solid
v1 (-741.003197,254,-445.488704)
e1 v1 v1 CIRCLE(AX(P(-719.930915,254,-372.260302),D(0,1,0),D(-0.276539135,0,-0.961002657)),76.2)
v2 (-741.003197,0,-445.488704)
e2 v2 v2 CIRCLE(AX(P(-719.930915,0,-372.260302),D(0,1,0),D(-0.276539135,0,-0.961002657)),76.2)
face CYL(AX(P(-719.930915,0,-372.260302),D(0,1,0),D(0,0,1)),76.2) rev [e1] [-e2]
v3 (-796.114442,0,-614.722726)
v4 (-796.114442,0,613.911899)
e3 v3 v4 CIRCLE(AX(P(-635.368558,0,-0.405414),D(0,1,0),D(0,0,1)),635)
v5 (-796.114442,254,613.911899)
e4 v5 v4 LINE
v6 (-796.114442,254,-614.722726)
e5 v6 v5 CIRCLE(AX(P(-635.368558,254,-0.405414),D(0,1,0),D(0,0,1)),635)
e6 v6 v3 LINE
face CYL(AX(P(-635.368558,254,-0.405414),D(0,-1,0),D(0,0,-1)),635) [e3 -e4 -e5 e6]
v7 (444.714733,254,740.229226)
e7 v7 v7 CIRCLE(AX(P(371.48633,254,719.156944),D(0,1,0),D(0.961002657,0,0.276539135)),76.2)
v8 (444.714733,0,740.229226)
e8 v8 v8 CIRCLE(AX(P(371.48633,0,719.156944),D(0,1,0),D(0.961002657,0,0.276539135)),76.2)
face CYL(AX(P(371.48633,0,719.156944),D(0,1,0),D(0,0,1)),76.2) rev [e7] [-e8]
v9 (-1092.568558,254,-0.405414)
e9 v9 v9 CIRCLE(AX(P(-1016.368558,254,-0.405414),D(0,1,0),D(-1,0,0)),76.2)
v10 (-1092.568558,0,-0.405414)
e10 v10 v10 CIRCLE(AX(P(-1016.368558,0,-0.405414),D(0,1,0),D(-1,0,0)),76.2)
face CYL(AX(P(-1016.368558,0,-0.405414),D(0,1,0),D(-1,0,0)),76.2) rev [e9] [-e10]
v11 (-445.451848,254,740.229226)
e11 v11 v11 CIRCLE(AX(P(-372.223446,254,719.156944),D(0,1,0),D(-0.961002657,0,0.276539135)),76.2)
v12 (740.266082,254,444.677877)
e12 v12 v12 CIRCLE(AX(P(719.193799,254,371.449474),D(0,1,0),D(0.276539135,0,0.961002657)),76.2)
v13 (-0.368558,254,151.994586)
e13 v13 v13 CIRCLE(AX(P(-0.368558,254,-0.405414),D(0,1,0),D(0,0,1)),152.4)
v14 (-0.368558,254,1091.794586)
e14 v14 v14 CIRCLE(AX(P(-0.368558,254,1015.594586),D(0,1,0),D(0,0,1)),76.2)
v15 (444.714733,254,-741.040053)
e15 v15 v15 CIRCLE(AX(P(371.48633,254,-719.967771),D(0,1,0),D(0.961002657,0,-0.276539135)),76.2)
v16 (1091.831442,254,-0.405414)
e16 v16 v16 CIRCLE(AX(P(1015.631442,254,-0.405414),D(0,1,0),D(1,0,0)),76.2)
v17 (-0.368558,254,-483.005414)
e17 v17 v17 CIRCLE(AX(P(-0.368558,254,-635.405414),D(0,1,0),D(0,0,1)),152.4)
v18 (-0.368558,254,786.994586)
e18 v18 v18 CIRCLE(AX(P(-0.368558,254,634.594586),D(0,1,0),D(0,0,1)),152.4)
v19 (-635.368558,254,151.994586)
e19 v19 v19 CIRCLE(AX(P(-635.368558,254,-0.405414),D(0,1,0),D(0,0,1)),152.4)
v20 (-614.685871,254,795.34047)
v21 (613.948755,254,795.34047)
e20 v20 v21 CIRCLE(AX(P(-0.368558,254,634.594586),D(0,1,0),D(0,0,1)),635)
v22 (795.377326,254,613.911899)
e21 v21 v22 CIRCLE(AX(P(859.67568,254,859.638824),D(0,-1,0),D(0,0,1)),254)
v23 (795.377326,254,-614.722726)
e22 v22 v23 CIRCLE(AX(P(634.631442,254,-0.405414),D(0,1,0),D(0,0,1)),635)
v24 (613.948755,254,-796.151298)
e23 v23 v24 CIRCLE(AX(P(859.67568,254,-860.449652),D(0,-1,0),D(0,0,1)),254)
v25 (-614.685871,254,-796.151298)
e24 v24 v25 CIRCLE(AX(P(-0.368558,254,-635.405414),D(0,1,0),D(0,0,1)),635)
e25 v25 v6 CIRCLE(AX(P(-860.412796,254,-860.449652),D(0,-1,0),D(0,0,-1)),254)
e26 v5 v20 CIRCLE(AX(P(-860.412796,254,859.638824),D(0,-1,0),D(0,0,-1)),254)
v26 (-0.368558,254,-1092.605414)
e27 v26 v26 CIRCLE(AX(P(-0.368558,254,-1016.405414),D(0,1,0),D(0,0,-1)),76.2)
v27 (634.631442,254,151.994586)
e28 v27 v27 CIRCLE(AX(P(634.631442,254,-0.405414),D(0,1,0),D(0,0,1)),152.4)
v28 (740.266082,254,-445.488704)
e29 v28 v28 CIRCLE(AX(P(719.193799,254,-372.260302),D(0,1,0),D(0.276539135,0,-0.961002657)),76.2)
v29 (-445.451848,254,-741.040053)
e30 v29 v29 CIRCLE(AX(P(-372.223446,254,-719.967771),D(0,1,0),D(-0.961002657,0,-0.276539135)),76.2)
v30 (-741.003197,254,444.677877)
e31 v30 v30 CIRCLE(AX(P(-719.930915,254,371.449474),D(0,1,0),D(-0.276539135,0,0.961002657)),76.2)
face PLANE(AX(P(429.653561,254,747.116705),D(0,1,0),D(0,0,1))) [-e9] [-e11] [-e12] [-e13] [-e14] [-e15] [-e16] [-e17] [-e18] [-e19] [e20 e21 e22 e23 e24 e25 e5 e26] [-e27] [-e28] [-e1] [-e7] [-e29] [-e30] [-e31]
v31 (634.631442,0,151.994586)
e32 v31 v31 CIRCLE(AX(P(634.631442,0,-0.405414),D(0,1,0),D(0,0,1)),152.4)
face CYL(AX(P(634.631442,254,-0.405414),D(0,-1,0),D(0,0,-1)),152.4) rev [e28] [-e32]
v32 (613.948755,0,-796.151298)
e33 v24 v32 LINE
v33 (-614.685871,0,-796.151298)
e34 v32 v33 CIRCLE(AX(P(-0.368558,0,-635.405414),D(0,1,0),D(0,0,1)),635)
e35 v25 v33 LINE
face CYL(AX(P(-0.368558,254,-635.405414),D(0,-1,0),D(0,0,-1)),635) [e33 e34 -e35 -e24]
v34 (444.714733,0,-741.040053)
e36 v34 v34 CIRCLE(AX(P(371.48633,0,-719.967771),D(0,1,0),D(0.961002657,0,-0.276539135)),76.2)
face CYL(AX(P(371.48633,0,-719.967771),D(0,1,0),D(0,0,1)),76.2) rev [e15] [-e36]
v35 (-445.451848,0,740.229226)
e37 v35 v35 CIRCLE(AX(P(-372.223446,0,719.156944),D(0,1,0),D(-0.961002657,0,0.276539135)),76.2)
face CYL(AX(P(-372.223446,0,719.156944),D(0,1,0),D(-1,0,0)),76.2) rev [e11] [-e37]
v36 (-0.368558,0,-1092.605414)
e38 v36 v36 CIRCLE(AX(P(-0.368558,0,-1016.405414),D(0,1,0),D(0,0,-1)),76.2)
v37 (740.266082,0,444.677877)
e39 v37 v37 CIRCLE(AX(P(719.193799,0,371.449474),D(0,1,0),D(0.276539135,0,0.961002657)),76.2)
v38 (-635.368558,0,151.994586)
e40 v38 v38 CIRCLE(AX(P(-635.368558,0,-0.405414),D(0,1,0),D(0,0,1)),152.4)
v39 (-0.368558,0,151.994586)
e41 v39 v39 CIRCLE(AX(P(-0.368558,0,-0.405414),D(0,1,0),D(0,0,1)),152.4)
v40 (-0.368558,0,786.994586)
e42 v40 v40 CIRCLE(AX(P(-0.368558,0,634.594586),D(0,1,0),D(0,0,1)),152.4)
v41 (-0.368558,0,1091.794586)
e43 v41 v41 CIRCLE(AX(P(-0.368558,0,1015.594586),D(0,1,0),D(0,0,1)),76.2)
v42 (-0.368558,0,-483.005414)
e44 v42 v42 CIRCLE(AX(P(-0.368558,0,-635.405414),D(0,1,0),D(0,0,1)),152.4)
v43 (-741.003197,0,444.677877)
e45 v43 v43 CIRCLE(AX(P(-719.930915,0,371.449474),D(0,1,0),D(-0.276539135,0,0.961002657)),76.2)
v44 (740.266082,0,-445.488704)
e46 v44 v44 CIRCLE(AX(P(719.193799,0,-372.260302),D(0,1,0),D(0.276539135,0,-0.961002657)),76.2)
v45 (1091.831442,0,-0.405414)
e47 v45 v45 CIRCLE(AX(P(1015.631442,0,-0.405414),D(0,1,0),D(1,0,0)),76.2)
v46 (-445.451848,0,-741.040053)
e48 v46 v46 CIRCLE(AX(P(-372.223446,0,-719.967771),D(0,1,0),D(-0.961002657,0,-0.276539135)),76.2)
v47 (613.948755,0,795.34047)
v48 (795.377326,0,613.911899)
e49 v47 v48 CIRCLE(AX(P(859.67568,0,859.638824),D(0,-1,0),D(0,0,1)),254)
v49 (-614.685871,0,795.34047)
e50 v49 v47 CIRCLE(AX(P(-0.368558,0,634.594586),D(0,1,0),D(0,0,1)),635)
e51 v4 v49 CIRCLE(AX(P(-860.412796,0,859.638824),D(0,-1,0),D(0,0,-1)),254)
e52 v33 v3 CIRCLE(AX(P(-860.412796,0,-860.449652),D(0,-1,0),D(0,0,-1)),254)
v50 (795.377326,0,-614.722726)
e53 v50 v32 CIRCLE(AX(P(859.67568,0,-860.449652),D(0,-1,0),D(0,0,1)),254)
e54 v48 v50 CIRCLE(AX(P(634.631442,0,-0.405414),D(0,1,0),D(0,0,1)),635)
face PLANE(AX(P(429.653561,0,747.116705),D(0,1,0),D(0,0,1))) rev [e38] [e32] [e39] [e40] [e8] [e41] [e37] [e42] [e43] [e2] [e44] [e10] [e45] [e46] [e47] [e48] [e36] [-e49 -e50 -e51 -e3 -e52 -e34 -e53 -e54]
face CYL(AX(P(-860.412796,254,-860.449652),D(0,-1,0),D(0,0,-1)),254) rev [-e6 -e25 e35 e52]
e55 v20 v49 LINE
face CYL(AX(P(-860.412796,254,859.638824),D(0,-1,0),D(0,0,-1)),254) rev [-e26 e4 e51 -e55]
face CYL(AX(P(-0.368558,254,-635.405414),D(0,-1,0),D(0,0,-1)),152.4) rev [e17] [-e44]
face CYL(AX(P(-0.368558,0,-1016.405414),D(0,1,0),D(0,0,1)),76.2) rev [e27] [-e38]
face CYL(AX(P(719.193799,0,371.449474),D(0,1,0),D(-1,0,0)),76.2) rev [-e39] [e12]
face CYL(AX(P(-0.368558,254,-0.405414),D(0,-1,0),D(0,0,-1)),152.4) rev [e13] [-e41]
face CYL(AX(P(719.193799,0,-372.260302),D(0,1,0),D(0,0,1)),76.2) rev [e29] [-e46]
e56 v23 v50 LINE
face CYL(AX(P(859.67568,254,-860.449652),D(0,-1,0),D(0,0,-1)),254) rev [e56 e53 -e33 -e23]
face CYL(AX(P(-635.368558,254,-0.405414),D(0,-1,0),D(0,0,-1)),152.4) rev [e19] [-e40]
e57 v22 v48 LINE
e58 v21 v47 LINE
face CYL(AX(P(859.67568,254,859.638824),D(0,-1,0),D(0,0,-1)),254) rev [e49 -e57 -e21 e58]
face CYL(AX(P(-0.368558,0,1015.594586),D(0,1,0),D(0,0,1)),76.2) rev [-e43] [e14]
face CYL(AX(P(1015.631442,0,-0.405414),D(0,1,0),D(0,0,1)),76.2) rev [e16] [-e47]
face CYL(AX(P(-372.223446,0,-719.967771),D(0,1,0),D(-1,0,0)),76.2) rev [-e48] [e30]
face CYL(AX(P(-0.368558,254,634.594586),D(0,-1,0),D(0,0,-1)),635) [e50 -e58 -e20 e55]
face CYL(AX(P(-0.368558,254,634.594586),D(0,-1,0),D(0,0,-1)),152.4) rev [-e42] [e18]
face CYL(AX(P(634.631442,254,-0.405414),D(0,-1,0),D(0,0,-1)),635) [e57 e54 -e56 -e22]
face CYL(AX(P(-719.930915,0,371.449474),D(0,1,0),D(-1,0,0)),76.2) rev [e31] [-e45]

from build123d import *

# Parameters (mm, degrees)
SKETCH1_R             = 152.4
BOSS_EXTRUDE1_DEPTH   = 254
SKETCH2_R             = 76.2
CUT_EXTRUDE1_DEPTH    = 254
CRVPATTERN1_OUTLINE_R = 76.2
CRVPATTERN1_DEPTH     = 254


# Read off the part's stored shape, not the designer's step: CrvPattern1
with BuildPart() as part:
    # Sketch1 → Boss-Extrude1 (new body)
    with BuildSketch(Plane(origin=(0, 0, 0), x_dir=(1, 0, 0), z_dir=(0, 1, 0))):
        with BuildLine():
            ThreePointArc((613.94875478, 796.151297918), (-0.368557952, 1270.405413748), (-614.685870684, 796.151297918))
            ThreePointArc((-614.685870684, 796.151297918), (-680.807673358, 680.844529161), (-796.114442116, 614.722726489))
            ThreePointArc((-796.114442116, 614.722726489), (-1270.36855796, 0.40541375), (-796.114442121, -613.911898992))
            ThreePointArc((-796.114442121, -613.911898992), (-680.80767336, -680.033701667), (-614.685870683, -795.340470428))
            ThreePointArc((-614.685870683, -795.340470428), (-0.368557952, -1269.594586252), (613.948754778, -795.340470428))
            ThreePointArc((613.948754778, -795.340470428), (680.070557455, -680.033701667), (795.377326216, -613.911898992))
            ThreePointArc((795.377326216, -613.911898992), (1269.631442055, 0.40541375), (795.377326211, 614.722726489))
            ThreePointArc((795.377326211, 614.722726489), (680.070557454, 680.844529161), (613.94875478, 796.151297918))
        make_face()
        with Locations(Location((-0.368557952, 0.405413748, 0), (0, 0, 270))):
            Circle(SKETCH1_R, mode=Mode.SUBTRACT)
        with Locations(Location((-0.368557952, 635.405413748, 0), (0, 0, 270))):
            Circle(SKETCH1_R, mode=Mode.SUBTRACT)
        with Locations(Location((634.631442048, 0.405413748, 0), (0, 0, 270))):
            Circle(SKETCH1_R, mode=Mode.SUBTRACT)
        with Locations(Location((-0.368557952, -634.594586252, 0), (0, 0, 270))):
            Circle(SKETCH1_R, mode=Mode.SUBTRACT)
        with Locations(Location((-635.368557952, 0.405413748, 0), (0, 0, 270))):
            Circle(SKETCH1_R, mode=Mode.SUBTRACT)
    extrude(amount=BOSS_EXTRUDE1_DEPTH)

    # Sketch2 → Cut-Extrude1 (cut)
    with BuildSketch(Plane(origin=(0, 254, 0), x_dir=(1, 0, 0), z_dir=(0, 1, 0))):
        with Locations(Location((-0.368557952, -1015.594586252, 0), (0, 0, 270))):
            Circle(SKETCH2_R)
    extrude(amount=-CUT_EXTRUDE1_DEPTH, mode=Mode.SUBTRACT)

    # CrvPattern1 outline → CrvPattern1 (cut)
    with BuildSketch(Plane(origin=(0, 0, 0), x_dir=(1, 0, 0), z_dir=(0, 1, 0))):
        with Locations((371.486330055, -719.156943677)):
            Circle(CRVPATTERN1_OUTLINE_R)
        with Locations((-372.22344596, -719.156943677)):
            Circle(CRVPATTERN1_OUTLINE_R)
        with Locations((-719.930915389, -371.449474263)):
            Circle(CRVPATTERN1_OUTLINE_R)
        with Locations((-1016.36855796, 0.405413748)):
            Circle(CRVPATTERN1_OUTLINE_R)
        with Locations((-719.930915387, 372.260301759)):
            Circle(CRVPATTERN1_OUTLINE_R)
        with Locations((-372.22344596, 719.967771172)):
            Circle(CRVPATTERN1_OUTLINE_R)
        with Locations((-0.368557952, 1016.405413748)):
            Circle(CRVPATTERN1_OUTLINE_R)
        with Locations((371.486330055, 719.967771172)):
            Circle(CRVPATTERN1_OUTLINE_R)
        with Locations((719.193799482, 372.260301759)):
            Circle(CRVPATTERN1_OUTLINE_R)
        with Locations((1015.631442055, 0.405413748)):
            Circle(CRVPATTERN1_OUTLINE_R)
        with Locations((719.193799484, -371.449474263)):
            Circle(CRVPATTERN1_OUTLINE_R)
    extrude(amount=CRVPATTERN1_DEPTH, mode=Mode.SUBTRACT)


solid = part.part
